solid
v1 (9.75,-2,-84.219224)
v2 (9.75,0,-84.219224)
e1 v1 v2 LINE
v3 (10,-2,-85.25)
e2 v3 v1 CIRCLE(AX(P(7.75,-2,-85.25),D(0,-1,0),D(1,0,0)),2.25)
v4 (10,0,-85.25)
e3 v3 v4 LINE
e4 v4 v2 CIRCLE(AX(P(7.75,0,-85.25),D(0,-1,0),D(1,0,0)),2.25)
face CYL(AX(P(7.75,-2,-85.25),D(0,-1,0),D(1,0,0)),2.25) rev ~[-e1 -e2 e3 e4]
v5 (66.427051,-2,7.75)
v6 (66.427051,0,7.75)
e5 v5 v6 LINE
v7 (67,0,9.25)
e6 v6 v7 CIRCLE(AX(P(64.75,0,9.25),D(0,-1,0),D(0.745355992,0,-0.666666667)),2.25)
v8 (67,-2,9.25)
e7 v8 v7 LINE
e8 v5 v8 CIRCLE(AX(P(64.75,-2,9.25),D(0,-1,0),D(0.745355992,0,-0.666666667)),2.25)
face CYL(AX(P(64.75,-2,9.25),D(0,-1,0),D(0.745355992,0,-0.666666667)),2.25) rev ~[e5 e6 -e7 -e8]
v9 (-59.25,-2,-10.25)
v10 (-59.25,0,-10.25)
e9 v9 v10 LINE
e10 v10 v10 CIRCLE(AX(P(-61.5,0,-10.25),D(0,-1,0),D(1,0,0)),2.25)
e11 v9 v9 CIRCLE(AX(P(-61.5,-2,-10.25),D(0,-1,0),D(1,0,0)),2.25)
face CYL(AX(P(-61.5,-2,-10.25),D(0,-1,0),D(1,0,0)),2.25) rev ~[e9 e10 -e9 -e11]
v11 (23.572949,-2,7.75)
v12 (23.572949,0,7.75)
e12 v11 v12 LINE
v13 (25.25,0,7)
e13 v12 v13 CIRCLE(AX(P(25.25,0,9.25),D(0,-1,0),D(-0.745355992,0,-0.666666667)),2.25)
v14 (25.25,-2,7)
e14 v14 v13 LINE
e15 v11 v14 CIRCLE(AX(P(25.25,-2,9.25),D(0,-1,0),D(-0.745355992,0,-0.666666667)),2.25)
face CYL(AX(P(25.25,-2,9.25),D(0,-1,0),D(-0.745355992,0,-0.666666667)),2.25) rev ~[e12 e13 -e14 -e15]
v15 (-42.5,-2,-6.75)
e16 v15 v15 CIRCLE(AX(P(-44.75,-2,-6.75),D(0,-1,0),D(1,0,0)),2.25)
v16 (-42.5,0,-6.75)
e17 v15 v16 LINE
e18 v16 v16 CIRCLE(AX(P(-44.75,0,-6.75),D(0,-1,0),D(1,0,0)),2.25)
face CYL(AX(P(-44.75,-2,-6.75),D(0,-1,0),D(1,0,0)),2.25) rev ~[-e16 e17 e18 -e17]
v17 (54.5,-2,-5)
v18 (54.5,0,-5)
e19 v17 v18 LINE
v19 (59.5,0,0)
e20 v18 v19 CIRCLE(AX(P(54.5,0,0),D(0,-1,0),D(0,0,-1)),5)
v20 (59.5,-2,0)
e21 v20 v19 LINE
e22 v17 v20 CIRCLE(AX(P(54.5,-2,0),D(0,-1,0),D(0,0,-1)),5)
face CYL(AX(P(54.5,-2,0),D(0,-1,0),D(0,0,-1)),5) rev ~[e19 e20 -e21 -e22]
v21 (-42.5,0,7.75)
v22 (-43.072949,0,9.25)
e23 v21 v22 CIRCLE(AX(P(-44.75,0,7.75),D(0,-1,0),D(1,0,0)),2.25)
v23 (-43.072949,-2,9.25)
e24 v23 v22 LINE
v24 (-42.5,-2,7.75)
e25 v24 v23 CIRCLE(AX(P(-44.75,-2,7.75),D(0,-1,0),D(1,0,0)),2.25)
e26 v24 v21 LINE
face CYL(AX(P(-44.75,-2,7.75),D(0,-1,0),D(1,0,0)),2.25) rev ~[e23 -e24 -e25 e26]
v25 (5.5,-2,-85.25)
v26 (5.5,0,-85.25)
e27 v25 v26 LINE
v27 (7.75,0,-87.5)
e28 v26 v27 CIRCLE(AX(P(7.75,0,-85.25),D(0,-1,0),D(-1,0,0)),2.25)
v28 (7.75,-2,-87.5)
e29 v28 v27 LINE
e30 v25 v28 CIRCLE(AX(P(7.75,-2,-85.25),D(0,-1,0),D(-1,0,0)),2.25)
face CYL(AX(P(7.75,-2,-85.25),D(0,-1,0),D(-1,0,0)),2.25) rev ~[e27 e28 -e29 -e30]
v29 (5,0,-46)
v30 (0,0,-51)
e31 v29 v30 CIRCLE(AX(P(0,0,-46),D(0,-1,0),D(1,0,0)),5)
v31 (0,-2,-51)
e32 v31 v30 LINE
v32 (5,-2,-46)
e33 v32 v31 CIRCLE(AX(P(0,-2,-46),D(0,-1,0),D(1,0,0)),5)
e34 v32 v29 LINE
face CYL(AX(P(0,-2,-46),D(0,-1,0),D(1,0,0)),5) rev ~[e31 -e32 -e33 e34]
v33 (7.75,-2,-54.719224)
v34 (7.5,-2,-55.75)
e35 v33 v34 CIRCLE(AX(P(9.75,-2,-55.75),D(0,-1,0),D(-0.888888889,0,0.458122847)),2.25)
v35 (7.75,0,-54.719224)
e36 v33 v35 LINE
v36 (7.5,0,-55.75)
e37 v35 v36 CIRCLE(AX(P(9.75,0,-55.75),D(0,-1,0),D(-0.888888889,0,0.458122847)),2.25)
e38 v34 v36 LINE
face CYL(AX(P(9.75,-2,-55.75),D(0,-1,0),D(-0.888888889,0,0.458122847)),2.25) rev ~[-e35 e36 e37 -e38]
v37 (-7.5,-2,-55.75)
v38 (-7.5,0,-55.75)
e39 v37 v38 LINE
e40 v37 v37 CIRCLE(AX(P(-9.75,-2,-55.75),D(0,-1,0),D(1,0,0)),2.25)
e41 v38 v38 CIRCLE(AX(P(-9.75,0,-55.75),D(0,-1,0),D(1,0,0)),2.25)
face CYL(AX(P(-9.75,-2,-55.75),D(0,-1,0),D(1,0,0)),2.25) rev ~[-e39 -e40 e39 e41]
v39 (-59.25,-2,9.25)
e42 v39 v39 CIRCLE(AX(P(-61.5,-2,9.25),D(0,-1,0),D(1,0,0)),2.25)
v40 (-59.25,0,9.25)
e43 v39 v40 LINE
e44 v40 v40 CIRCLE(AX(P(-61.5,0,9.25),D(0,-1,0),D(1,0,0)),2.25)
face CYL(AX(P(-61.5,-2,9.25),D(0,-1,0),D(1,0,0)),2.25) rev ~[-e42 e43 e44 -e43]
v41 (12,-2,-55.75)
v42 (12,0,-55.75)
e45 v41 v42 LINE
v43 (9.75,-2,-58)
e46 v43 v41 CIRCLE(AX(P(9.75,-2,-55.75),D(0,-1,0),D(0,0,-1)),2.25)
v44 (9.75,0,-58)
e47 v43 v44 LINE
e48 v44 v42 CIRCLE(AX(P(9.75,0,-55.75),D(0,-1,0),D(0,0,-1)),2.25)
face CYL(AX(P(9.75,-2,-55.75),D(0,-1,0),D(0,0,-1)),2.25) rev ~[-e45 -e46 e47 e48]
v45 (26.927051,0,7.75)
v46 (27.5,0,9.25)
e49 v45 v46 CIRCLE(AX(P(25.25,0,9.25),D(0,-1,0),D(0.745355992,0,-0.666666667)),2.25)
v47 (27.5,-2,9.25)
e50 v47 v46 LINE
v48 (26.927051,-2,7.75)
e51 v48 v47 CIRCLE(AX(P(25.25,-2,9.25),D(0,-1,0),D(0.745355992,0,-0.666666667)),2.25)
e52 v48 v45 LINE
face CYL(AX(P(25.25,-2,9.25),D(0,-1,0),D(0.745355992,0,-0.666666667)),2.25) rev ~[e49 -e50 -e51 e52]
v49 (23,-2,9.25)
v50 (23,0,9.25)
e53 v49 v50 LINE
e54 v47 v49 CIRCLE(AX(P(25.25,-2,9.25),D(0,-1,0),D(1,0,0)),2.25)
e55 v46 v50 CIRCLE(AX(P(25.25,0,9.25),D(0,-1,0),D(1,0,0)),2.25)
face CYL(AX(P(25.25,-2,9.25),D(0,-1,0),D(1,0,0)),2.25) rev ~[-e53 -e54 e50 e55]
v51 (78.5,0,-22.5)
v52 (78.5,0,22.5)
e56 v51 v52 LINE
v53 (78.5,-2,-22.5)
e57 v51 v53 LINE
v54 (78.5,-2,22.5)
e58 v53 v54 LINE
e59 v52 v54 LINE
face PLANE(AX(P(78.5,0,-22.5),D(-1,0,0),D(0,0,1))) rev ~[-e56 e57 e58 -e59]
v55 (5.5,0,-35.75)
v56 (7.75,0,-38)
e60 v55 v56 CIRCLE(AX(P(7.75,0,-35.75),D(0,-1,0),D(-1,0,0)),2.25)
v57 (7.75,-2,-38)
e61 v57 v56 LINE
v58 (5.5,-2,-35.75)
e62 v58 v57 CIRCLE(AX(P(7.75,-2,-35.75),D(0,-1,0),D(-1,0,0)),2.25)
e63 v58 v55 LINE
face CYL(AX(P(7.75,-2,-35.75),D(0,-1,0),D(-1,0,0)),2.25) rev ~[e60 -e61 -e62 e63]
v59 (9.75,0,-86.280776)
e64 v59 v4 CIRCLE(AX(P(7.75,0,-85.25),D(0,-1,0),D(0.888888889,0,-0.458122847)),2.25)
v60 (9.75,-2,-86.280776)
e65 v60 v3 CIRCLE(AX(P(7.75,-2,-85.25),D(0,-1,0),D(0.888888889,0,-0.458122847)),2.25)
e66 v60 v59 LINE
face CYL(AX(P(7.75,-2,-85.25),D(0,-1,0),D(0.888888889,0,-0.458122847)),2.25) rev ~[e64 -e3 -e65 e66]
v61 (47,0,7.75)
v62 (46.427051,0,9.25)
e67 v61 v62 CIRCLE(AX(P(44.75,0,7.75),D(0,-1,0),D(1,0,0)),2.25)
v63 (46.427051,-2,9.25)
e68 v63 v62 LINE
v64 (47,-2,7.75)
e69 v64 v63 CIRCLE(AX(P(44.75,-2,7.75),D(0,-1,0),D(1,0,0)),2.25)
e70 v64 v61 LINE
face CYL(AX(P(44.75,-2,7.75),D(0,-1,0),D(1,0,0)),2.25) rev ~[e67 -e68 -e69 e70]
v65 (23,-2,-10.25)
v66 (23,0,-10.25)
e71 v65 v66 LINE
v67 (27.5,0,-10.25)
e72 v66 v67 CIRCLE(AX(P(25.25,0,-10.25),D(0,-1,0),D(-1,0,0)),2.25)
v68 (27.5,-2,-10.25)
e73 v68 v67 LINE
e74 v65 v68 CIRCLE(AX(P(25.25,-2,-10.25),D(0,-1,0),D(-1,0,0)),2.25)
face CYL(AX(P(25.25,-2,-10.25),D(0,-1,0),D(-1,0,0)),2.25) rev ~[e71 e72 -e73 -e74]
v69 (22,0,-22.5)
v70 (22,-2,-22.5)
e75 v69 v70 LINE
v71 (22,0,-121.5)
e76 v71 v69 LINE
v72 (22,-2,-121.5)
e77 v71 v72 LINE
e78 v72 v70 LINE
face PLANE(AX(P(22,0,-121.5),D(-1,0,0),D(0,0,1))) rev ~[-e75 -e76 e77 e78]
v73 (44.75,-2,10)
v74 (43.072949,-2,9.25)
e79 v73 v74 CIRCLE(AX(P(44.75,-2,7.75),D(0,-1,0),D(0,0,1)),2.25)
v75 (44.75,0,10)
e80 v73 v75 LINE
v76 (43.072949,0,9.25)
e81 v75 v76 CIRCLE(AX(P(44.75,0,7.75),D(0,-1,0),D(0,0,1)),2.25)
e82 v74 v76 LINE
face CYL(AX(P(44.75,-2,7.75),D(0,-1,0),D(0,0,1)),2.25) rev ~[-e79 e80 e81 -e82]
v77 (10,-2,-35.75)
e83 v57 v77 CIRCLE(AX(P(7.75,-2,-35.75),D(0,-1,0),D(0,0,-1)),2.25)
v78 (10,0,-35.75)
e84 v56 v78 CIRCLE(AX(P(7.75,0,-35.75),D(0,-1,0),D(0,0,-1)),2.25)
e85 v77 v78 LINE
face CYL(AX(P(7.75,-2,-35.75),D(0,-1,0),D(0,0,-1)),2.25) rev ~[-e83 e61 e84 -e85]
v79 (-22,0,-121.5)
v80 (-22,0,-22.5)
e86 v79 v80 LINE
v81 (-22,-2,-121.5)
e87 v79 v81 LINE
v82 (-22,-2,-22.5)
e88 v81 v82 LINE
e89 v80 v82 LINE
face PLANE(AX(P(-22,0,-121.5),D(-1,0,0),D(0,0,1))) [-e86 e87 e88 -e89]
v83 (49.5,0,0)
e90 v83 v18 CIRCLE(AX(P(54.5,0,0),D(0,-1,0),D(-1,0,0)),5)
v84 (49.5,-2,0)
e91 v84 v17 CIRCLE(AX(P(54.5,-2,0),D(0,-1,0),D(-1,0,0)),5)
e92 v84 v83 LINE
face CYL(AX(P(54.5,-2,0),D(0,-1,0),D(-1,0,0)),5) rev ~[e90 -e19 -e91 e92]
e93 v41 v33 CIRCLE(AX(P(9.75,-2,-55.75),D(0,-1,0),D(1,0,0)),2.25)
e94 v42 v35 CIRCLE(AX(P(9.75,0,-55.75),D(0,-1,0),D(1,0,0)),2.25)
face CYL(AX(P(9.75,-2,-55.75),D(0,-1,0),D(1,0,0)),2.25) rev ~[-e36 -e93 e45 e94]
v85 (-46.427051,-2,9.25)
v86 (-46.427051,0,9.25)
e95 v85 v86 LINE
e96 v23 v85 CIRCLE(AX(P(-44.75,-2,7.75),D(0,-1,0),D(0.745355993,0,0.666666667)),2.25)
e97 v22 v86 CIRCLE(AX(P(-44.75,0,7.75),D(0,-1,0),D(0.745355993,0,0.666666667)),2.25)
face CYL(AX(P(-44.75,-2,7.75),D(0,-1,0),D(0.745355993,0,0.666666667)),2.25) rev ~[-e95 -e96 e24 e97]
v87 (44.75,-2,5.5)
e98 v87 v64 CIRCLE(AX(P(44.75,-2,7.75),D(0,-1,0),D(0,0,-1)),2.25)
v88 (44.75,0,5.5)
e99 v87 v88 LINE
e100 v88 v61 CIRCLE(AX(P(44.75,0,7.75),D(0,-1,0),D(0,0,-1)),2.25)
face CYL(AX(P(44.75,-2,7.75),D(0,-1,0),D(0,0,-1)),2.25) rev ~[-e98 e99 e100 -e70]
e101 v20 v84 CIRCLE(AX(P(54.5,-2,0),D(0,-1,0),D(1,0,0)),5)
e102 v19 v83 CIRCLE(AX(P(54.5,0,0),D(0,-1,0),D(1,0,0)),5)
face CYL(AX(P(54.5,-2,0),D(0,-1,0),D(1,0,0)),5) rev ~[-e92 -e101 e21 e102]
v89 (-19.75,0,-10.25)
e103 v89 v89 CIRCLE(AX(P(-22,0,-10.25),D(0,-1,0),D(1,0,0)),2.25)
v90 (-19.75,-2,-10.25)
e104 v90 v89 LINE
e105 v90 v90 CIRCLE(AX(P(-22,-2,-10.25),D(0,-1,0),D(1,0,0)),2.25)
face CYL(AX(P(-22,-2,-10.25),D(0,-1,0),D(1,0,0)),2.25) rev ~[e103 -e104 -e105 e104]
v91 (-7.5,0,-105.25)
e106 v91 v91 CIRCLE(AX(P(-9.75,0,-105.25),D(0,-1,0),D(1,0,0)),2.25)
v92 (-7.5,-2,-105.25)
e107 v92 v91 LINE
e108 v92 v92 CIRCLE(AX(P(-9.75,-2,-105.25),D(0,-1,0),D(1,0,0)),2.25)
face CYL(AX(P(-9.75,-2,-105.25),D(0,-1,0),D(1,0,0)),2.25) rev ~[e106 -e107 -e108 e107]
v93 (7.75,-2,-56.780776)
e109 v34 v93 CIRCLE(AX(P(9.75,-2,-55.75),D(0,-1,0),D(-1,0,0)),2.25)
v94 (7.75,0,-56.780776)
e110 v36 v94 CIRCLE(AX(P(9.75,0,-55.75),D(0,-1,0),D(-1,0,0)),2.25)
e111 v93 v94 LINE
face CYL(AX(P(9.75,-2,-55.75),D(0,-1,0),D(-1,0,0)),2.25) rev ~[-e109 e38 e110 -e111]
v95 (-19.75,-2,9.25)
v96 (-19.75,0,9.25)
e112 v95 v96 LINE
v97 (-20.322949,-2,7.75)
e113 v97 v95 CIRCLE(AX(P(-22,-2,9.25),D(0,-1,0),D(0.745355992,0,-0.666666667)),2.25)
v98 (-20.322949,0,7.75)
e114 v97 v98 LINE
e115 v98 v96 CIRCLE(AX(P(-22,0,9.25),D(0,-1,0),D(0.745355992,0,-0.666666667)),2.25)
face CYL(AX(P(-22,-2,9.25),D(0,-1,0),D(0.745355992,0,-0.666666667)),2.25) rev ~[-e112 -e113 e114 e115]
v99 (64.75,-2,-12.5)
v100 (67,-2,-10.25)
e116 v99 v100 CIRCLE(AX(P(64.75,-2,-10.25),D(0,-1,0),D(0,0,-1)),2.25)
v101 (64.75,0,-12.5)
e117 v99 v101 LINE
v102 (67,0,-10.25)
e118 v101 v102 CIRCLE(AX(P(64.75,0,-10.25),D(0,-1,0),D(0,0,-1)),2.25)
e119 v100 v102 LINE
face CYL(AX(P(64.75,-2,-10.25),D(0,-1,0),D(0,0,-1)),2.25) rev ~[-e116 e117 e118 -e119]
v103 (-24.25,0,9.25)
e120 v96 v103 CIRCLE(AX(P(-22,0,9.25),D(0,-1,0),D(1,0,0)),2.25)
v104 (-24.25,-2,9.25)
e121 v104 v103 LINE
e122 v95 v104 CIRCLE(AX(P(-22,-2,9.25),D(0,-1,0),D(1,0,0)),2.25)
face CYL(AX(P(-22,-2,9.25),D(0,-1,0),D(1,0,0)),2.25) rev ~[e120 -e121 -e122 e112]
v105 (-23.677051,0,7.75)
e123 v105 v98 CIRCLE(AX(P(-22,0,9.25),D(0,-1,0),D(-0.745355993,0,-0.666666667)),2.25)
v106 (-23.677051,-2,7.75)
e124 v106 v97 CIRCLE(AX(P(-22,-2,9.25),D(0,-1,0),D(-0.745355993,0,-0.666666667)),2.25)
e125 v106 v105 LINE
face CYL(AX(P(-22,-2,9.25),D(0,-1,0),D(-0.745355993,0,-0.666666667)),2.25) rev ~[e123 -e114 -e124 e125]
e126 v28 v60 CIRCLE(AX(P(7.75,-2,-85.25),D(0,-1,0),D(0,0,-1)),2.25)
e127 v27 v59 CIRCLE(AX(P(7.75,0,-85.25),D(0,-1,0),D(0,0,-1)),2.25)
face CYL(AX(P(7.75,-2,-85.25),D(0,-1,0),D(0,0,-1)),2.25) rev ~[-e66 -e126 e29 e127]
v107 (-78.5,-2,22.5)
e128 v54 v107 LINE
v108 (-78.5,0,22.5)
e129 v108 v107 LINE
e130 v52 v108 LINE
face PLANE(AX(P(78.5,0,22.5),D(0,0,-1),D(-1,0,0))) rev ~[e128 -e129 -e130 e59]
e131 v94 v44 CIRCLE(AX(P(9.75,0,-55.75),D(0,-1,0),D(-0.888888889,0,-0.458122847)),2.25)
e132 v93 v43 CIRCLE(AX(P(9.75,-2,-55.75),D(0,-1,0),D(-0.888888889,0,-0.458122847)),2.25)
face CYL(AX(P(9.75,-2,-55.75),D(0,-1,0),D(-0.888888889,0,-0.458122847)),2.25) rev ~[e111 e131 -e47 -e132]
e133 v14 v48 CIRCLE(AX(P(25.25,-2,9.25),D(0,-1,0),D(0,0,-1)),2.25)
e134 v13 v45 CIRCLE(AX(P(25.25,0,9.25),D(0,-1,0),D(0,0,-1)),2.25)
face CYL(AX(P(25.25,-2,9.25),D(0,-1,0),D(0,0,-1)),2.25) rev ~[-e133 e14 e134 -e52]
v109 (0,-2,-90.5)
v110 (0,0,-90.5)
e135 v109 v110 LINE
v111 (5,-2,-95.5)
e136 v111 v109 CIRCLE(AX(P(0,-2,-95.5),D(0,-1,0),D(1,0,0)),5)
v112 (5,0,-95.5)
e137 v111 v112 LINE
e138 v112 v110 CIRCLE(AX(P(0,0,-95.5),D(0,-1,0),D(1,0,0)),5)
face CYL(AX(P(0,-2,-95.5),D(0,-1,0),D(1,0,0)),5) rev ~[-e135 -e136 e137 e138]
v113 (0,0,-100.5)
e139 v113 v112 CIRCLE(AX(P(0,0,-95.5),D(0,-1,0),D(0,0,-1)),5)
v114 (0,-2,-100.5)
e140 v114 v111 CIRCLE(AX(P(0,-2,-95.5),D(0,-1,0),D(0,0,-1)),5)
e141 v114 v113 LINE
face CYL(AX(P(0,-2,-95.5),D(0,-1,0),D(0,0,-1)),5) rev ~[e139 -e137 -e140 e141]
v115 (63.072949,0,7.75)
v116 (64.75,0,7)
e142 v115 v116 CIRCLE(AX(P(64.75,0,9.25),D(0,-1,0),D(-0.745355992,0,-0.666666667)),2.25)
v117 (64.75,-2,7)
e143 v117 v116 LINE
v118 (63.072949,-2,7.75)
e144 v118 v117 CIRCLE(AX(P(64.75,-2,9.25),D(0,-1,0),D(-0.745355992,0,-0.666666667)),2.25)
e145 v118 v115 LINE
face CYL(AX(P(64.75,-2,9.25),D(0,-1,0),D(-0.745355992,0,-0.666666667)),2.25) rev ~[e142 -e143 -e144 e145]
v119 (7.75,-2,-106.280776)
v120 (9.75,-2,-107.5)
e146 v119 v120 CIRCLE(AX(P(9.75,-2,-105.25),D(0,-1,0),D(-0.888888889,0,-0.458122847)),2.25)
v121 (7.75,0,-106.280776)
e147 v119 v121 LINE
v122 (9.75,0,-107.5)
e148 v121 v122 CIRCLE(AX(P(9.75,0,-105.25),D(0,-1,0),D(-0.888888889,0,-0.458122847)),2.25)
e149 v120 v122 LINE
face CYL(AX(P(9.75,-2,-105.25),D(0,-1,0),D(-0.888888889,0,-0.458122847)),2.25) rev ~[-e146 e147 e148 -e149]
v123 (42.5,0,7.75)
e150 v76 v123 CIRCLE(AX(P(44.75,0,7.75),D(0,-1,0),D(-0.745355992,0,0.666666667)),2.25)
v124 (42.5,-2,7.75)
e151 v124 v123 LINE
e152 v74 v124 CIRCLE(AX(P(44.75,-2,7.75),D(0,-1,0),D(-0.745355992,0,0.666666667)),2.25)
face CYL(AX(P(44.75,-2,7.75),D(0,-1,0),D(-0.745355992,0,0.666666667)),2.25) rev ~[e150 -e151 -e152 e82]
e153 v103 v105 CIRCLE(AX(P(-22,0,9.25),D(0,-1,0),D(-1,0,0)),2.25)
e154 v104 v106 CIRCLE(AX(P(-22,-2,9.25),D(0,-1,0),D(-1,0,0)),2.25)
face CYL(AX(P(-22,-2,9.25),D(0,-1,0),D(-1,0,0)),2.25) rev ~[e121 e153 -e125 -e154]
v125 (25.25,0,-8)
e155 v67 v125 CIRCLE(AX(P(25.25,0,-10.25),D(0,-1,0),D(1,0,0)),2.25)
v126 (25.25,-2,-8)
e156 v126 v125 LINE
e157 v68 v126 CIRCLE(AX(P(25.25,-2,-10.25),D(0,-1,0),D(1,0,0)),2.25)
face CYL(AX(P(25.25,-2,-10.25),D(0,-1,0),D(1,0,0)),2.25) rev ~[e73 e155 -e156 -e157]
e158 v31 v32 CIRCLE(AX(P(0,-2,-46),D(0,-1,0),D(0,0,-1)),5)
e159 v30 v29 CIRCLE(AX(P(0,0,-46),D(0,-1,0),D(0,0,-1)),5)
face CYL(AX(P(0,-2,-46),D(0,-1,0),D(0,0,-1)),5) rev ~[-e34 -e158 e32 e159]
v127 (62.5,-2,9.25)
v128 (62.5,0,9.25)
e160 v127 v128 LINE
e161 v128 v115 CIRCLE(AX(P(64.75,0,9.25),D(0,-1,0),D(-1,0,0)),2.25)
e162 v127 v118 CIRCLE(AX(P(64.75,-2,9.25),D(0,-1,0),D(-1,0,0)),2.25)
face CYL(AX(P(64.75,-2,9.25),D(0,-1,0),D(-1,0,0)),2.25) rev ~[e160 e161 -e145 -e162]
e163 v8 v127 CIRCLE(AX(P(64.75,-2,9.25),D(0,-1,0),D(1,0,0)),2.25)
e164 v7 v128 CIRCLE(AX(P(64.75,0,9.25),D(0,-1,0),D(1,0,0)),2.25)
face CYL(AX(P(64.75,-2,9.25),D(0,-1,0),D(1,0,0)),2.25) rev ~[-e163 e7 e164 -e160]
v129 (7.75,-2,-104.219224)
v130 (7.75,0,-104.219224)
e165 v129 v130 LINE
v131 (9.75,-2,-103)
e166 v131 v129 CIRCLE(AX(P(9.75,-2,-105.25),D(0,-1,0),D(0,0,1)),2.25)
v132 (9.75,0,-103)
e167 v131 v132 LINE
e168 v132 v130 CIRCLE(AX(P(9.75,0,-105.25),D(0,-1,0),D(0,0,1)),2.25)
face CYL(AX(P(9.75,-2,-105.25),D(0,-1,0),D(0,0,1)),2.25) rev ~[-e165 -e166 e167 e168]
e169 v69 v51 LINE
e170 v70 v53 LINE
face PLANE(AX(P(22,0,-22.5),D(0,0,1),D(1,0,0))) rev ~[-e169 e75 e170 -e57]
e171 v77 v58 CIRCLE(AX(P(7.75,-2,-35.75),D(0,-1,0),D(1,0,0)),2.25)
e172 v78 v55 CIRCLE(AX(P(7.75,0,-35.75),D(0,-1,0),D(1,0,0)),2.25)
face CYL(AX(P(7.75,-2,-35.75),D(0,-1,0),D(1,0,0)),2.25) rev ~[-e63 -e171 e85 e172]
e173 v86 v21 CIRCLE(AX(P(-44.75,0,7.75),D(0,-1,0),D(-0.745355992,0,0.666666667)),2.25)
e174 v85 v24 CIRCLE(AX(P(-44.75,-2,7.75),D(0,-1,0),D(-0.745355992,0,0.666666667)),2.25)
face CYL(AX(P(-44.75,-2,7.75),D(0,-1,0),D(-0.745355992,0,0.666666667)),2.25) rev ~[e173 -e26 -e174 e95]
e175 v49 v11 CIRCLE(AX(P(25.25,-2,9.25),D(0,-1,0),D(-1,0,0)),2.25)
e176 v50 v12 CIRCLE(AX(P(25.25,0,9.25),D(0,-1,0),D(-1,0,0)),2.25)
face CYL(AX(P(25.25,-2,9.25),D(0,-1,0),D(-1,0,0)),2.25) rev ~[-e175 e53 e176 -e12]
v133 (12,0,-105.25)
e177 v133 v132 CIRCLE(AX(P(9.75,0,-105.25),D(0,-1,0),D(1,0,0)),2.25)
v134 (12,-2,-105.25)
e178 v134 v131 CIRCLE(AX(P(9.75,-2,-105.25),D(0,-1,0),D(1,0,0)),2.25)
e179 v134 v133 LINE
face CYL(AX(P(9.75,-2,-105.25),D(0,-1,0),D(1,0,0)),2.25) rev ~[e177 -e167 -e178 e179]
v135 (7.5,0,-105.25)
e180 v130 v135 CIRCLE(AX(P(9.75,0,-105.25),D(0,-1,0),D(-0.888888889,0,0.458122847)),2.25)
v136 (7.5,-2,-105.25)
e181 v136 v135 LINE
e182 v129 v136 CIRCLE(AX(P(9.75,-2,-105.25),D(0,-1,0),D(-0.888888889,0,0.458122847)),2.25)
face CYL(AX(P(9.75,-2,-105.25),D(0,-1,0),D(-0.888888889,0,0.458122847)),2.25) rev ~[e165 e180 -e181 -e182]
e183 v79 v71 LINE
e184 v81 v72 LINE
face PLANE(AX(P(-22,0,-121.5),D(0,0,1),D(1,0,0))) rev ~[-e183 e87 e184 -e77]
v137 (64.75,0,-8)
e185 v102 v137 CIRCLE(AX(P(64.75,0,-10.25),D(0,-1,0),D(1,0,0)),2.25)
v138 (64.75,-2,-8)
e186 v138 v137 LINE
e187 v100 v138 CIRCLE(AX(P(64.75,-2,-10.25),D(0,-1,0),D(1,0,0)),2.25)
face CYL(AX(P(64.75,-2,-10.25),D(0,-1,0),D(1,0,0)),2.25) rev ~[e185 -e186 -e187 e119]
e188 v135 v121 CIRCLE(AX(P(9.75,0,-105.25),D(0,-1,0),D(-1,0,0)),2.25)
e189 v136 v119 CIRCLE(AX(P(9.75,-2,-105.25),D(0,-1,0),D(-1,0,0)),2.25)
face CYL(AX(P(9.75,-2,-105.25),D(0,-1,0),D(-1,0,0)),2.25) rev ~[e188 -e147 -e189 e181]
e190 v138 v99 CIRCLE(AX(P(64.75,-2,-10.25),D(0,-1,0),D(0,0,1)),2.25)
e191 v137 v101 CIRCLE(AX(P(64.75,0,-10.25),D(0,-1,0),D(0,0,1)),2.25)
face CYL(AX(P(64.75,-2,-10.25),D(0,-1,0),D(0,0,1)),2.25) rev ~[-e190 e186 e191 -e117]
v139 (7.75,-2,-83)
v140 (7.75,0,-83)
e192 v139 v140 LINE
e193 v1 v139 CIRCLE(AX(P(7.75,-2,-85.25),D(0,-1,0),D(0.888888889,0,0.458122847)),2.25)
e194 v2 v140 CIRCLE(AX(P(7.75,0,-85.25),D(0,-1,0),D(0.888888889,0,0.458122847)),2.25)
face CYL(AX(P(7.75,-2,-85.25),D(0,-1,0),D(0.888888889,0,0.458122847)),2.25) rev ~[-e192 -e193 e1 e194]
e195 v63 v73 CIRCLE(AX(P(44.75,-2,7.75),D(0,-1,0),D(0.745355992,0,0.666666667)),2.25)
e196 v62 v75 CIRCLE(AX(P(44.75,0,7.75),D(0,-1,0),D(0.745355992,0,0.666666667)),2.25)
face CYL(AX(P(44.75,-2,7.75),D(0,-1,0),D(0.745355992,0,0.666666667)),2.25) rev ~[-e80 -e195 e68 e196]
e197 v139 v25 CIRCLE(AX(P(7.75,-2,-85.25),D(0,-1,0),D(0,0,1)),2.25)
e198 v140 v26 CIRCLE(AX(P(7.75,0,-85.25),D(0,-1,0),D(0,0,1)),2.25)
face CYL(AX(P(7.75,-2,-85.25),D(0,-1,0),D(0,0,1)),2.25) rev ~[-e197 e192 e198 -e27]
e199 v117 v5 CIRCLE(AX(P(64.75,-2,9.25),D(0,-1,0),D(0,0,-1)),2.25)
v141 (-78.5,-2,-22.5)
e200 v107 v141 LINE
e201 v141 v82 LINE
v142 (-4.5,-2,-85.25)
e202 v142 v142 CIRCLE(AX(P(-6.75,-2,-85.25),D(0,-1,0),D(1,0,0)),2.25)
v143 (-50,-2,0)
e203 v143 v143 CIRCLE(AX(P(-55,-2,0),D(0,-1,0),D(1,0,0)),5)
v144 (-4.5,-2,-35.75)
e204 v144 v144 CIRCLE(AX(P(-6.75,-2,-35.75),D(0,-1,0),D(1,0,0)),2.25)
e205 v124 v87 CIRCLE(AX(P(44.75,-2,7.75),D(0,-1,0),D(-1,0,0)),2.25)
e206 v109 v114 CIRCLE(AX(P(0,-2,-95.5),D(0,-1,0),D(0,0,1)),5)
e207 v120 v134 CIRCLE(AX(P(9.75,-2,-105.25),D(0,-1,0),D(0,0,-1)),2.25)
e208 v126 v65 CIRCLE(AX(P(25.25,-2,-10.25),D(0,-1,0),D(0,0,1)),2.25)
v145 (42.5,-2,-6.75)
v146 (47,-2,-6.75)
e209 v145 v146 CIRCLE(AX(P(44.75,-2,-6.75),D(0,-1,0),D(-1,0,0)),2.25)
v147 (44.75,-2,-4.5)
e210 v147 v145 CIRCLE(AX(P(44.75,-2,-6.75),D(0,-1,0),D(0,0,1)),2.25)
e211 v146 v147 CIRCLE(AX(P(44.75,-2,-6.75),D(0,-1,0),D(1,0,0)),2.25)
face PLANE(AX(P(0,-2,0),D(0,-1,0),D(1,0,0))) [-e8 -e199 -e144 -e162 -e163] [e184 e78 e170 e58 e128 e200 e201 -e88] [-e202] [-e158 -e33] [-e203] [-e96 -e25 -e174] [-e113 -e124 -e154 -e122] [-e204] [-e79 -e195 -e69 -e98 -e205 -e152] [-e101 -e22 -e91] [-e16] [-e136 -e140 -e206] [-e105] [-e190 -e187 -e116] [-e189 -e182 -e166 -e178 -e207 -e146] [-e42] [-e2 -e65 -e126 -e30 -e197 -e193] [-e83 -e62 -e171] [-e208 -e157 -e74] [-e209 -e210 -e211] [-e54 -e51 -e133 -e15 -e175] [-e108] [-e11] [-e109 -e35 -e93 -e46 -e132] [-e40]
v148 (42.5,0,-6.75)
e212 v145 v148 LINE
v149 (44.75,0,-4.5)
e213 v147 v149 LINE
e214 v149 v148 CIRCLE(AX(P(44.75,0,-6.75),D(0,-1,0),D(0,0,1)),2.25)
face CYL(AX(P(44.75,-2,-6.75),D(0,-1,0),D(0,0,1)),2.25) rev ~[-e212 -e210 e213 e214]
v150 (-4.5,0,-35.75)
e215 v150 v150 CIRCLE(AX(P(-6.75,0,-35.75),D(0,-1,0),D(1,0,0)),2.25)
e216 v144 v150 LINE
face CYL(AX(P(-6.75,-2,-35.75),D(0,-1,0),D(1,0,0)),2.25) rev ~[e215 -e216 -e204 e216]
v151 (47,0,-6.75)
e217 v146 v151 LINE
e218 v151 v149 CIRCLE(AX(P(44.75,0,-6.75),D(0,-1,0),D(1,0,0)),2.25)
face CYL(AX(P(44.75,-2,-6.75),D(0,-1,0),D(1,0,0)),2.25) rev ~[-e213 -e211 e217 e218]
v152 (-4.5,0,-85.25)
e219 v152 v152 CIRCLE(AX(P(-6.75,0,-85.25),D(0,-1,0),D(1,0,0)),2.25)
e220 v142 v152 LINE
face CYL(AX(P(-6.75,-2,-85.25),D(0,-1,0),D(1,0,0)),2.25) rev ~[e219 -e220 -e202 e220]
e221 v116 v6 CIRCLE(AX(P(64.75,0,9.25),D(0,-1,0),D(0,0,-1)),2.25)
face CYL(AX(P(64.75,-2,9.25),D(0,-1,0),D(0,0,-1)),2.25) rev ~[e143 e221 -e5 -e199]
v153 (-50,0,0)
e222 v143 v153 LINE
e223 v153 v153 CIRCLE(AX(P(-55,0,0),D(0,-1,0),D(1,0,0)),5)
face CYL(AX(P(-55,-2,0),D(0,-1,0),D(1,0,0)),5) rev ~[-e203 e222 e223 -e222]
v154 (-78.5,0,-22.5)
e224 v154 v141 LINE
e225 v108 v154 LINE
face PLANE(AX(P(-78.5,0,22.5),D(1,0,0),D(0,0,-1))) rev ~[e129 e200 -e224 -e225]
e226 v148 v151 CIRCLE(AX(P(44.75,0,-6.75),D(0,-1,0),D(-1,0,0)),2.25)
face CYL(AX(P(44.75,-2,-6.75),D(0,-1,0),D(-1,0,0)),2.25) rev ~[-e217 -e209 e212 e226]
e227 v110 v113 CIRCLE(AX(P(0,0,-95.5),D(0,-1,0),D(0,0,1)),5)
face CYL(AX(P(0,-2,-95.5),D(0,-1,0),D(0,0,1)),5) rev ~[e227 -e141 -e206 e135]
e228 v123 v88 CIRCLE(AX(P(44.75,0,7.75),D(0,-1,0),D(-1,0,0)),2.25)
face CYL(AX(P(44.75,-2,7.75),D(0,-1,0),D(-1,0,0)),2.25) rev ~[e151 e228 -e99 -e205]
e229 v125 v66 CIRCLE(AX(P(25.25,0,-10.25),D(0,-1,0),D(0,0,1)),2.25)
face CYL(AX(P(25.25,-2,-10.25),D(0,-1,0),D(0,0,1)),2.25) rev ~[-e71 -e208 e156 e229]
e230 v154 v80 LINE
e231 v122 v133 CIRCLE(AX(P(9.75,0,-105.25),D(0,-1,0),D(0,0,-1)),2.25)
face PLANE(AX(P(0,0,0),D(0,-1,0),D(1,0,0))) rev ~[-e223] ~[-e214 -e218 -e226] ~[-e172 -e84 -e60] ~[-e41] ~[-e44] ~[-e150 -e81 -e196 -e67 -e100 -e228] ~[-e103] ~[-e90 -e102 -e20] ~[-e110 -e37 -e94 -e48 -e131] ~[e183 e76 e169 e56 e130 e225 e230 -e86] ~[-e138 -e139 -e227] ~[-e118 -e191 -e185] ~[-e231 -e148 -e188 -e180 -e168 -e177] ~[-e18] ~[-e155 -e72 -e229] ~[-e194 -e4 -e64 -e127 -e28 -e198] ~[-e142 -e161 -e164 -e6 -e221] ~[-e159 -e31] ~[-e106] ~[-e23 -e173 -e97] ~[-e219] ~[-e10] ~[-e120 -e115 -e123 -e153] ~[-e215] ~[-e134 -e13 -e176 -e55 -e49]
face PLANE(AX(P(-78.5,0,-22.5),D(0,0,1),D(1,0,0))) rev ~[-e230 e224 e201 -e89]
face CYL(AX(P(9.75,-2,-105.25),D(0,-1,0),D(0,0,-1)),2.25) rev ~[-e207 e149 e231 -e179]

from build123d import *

# Parameters (mm, degrees)
F0_W     = 44
F0_H     = 99
F1_DEPTH = 2
F2_R     = 2.25
F2_R_2   = 5
F3_DEPTH = 2.001


with BuildPart() as f1:
    # F0 (on Front) → F1 (new body)
    with BuildSketch(Plane.XZ):
        Polygon((-78.5, 22.5), (-78.5, -22.5), (-22, -22.5), (22, -22.5), (78.5, -22.5), (78.5, 22.5), align=None)
        with Locations((0, -72)):
            Rectangle(F0_W, F0_H)
    extrude(amount=F1_DEPTH)

    # F2 (on face) → F3 (cut, through all)
    with BuildSketch(Plane.XZ.offset(2)):
        with BuildLine():
            ThreePointArc((7.75, -106.2807764064), (8.5788353904, -107.1711646096), (9.75, -107.5))
            Line((9.75, -107.5), (9.75, -105.25))
            Line((9.75, -105.25), (7.75, -105.25))
            Line((7.75, -105.25), (7.75, -106.2807764064))
        make_face()
        with BuildLine():
            Line((9.75, -105.25), (9.75, -107.5))
            ThreePointArc((9.75, -107.5), (11.3409902577, -106.8409902577), (12, -105.25))
            Line((12, -105.25), (9.75, -105.25))
        make_face()
        with BuildLine():
            Line((9.75, -103), (9.75, -105.25))
            Line((9.75, -105.25), (12, -105.25))
            ThreePointArc((12, -105.25), (11.3409902577, -103.6590097423), (9.75, -103))
        make_face()
        with BuildLine():
            Line((7.75, -105.25), (9.75, -105.25))
            Line((9.75, -105.25), (9.75, -103))
            ThreePointArc((9.75, -103), (8.5788353904, -103.3288353904), (7.75, -104.2192235936))
            Line((7.75, -104.2192235936), (7.75, -105.25))
        make_face()
        with BuildLine():
            ThreePointArc((7.5, -105.25), (7.5633930394, -105.7803300859), (7.75, -106.2807764064))
            Line((7.75, -106.2807764064), (7.75, -105.25))
            Line((7.75, -105.25), (7.5, -105.25))
        make_face()
        with Locations((-9.75, -105.25)):
            Circle(F2_R)
        with Locations((-6.75, -85.25)):
            Circle(F2_R)
        with Locations((-9.75, -55.75)):
            Circle(F2_R)
        with BuildLine():
            ThreePointArc((5, -46), (-3.5355339059, -42.4644660941), (0, -51))
            ThreePointArc((0, -51), (3.5355339059, -49.5355339059), (5, -46))
        make_face()
        with Locations((-6.75, -35.75)):
            Circle(F2_R)
        with BuildLine():
            ThreePointArc((5.5, -35.75), (6.1590097423, -37.3409902577), (7.75, -38))
            Line((7.75, -38), (7.75, -35.75))
            Line((7.75, -35.75), (5.5, -35.75))
        make_face()
        with BuildLine():
            Line((7.75, -35.75), (7.75, -38))
            ThreePointArc((7.75, -38), (9.3409902577, -37.3409902577), (10, -35.75))
            ThreePointArc((10, -35.75), (7.75, -33.5), (5.5, -35.75))
            Line((5.5, -35.75), (7.75, -35.75))
        make_face()
        with Locations((-61.5, -10.25)):
            Circle(F2_R)
        with BuildLine():
            ThreePointArc((-24.25, -10.25), (-22, -12.5), (-19.75, -10.25))
            Line((-19.75, -10.25), (-22, -10.25))
            Line((-22, -10.25), (-24.25, -10.25))
        make_face()
        with BuildLine():
            Line((-22, -10.25), (-19.75, -10.25))
            ThreePointArc((-19.75, -10.25), (-22, -8), (-24.25, -10.25))
            Line((-24.25, -10.25), (-22, -10.25))
        make_face()
        with BuildLine():
            ThreePointArc((27.5, -10.25), (26.8409902577, -8.6590097423), (25.25, -8))
            Line((25.25, -8), (25.25, -10.25))
            Line((25.25, -10.25), (23, -10.25))
            ThreePointArc((23, -10.25), (25.25, -12.5), (27.5, -10.25))
        make_face()
        with BuildLine():
            Line((25.25, -10.25), (25.25, -8))
            ThreePointArc((25.25, -8), (23.6590097423, -8.6590097423), (23, -10.25))
            Line((23, -10.25), (25.25, -10.25))
        make_face()
        with Locations((-44.75, -6.75)):
            Circle(F2_R)
        with Locations((-55, 0)):
            Circle(F2_R_2)
        with Locations((-61.5, 9.25)):
            Circle(F2_R)
        with BuildLine():
            Line((7.5, -105.25), (7.75, -105.25))
            Line((7.75, -105.25), (7.75, -104.2192235936))
            ThreePointArc((7.75, -104.2192235936), (7.5633930394, -104.7196699141), (7.5, -105.25))
        make_face()
        with BuildLine():
            ThreePointArc((0, -90.5), (-5, -95.5), (0, -100.5))
            Line((0, -100.5), (0, -95.5))
            Line((0, -95.5), (0, -90.5))
        make_face()
        with BuildLine():
            Line((0, -95.5), (0, -100.5))
            ThreePointArc((0, -100.5), (3.5355339059, -99.0355339059), (5, -95.5))
            Line((5, -95.5), (0, -95.5))
        make_face()
        with BuildLine():
            Line((9.75, -85.25), (9.75, -86.2807764064))
            ThreePointArc((9.75, -86.2807764064), (9.9366069606, -85.7803300859), (10, -85.25))
            Line((10, -85.25), (9.75, -85.25))
        make_face()
        with BuildLine():
            ThreePointArc((7.75, -87.5), (8.9211646096, -87.1711646096), (9.75, -86.2807764064))
            Line((9.75, -86.2807764064), (9.75, -85.25))
            Line((9.75, -85.25), (7.75, -85.25))
            Line((7.75, -85.25), (7.75, -87.5))
        make_face()
        with BuildLine():
            Line((0, -90.5), (0, -95.5))
            Line((0, -95.5), (5, -95.5))
            ThreePointArc((5, -95.5), (3.5355339059, -91.9644660941), (0, -90.5))
        make_face()
        with BuildLine():
            Line((9.75, -85.25), (10, -85.25))
            ThreePointArc((10, -85.25), (9.9366069606, -84.7196699141), (9.75, -84.2192235936))
            Line((9.75, -84.2192235936), (9.75, -85.25))
        make_face()
        with BuildLine():
            ThreePointArc((5.5, -85.25), (6.1590097423, -86.8409902577), (7.75, -87.5))
            Line((7.75, -87.5), (7.75, -85.25))
            Line((7.75, -85.25), (5.5, -85.25))
        make_face()
        with BuildLine():
            Line((7.75, -85.25), (9.75, -85.25))
            Line((9.75, -85.25), (9.75, -84.2192235936))
            ThreePointArc((9.75, -84.2192235936), (8.9211646096, -83.3288353904), (7.75, -83))
            Line((7.75, -83), (7.75, -85.25))
        make_face()
        with BuildLine():
            Line((5.5, -85.25), (7.75, -85.25))
            Line((7.75, -85.25), (7.75, -83))
            ThreePointArc((7.75, -83), (6.1590097423, -83.6590097423), (5.5, -85.25))
        make_face()
        with BuildLine():
            ThreePointArc((7.75, -56.7807764064), (8.5788353904, -57.6711646096), (9.75, -58))
            Line((9.75, -58), (9.75, -55.75))
            Line((9.75, -55.75), (7.75, -55.75))
            Line((7.75, -55.75), (7.75, -56.7807764064))
        make_face()
        with BuildLine():
            Line((9.75, -55.75), (9.75, -58))
            ThreePointArc((9.75, -58), (11.3409902577, -57.3409902577), (12, -55.75))
            ThreePointArc((12, -55.75), (10.2803300859, -53.5633930394), (7.75, -54.7192235936))
            Line((7.75, -54.7192235936), (7.75, -55.75))
            Line((7.75, -55.75), (9.75, -55.75))
        make_face()
        with BuildLine():
            ThreePointArc((49.5, 0), (50.9644660941, -3.5355339059), (54.5, -5))
            Line((54.5, -5), (54.5, 0))
            Line((54.5, 0), (49.5, 0))
        make_face()
        with BuildLine():
            Line((54.5, 0), (54.5, -5))
            ThreePointArc((54.5, -5), (58.0355339059, -3.5355339059), (59.5, 0))
            Line((59.5, 0), (54.5, 0))
        make_face()
        with BuildLine():
            Line((7.75, -55.75), (7.5, -55.75))
            ThreePointArc((7.5, -55.75), (7.5633930394, -56.2803300859), (7.75, -56.7807764064))
            Line((7.75, -56.7807764064), (7.75, -55.75))
        make_face()
        with BuildLine():
            ThreePointArc((7.75, -54.7192235936), (7.5633930394, -55.2196699141), (7.5, -55.75))
            Line((7.5, -55.75), (7.75, -55.75))
            Line((7.75, -55.75), (7.75, -54.7192235936))
        make_face()
        with BuildLine():
            Line((44.75, 9.25), (44.75, 10))
            ThreePointArc((44.75, 10), (43.8314413465, 9.8039595906), (43.0729490169, 9.25))
            Line((43.0729490169, 9.25), (44.75, 9.25))
        make_face()
        with BuildLine():
            ThreePointArc((46.4270509831, 9.25), (45.6685586535, 9.8039595906), (44.75, 10))
            Line((44.75, 10), (44.75, 9.25))
            Line((44.75, 9.25), (46.4270509831, 9.25))
        make_face()
        with BuildLine():
            Line((49.5, 0), (54.5, 0))
            Line((54.5, 0), (59.5, 0))
            ThreePointArc((59.5, 0), (54.5, 5), (49.5, 0))
        make_face()
        with BuildLine():
            ThreePointArc((64.75, -8), (62.5, -10.25), (64.75, -12.5))
            Line((64.75, -12.5), (64.75, -10.25))
            Line((64.75, -10.25), (64.75, -8))
        make_face()
        with BuildLine():
            Line((64.75, -10.25), (64.75, -12.5))
            ThreePointArc((64.75, -12.5), (66.3409902577, -11.8409902577), (67, -10.25))
            Line((67, -10.25), (64.75, -10.25))
        make_face()
        with BuildLine():
            ThreePointArc((47, 7.75), (46.8518878077, 8.552849702), (46.4270509831, 9.25))
            Line((46.4270509831, 9.25), (44.75, 9.25))
            Line((44.75, 9.25), (44.75, 7.75))
            Line((44.75, 7.75), (47, 7.75))
        make_face()
        with BuildLine():
            Line((44.75, 9.25), (43.0729490169, 9.25))
            ThreePointArc((43.0729490169, 9.25), (42.6481121923, 8.552849702), (42.5, 7.75))
            Line((42.5, 7.75), (44.75, 7.75))
            Line((44.75, 7.75), (44.75, 9.25))
        make_face()
        with BuildLine():
            Line((64.75, -8), (64.75, -10.25))
            Line((64.75, -10.25), (67, -10.25))
            ThreePointArc((67, -10.25), (66.3409902577, -8.6590097423), (64.75, -8))
        make_face()
        with BuildLine():
            ThreePointArc((44.75, 5.5), (46.3409902577, 6.1590097423), (47, 7.75))
            Line((47, 7.75), (44.75, 7.75))
            Line((44.75, 7.75), (44.75, 5.5))
        make_face()
        with BuildLine():
            Line((64.75, 9.25), (62.5, 9.25))
            ThreePointArc((62.5, 9.25), (62.6481121923, 8.447150298), (63.0729490169, 7.75))
            Line((63.0729490169, 7.75), (64.75, 7.75))
            Line((64.75, 7.75), (64.75, 9.25))
        make_face()
        with BuildLine():
            ThreePointArc((67, 9.25), (64.75, 11.5), (62.5, 9.25))
            Line((62.5, 9.25), (64.75, 9.25))
            Line((64.75, 9.25), (64.75, 7.75))
            Line((64.75, 7.75), (66.4270509831, 7.75))
            ThreePointArc((66.4270509831, 7.75), (66.8518878077, 8.447150298), (67, 9.25))
        make_face()
        with BuildLine():
            Line((44.75, 7.75), (42.5, 7.75))
            ThreePointArc((42.5, 7.75), (43.1590097423, 6.1590097423), (44.75, 5.5))
            Line((44.75, 5.5), (44.75, 7.75))
        make_face()
        with BuildLine():
            ThreePointArc((26.9270509831, 7.75), (27.3518878077, 8.447150298), (27.5, 9.25))
            Line((27.5, 9.25), (25.25, 9.25))
            Line((25.25, 9.25), (25.25, 7.75))
            Line((25.25, 7.75), (26.9270509831, 7.75))
        make_face()
        with BuildLine():
            Line((25.25, 9.25), (27.5, 9.25))
            ThreePointArc((27.5, 9.25), (25.25, 11.5), (23, 9.25))
            Line((23, 9.25), (25.25, 9.25))
        make_face()
        with BuildLine():
            ThreePointArc((64.75, 7), (65.6685586535, 7.1960404094), (66.4270509831, 7.75))
            Line((66.4270509831, 7.75), (64.75, 7.75))
            Line((64.75, 7.75), (64.75, 7))
        make_face()
        with BuildLine():
            ThreePointArc((47, -6.75), (46.3409902577, -5.1590097423), (44.75, -4.5))
            Line((44.75, -4.5), (44.75, -6.75))
            Line((44.75, -6.75), (42.5, -6.75))
            ThreePointArc((42.5, -6.75), (44.75, -9), (47, -6.75))
        make_face()
        with BuildLine():
            Line((44.75, -6.75), (44.75, -4.5))
            ThreePointArc((44.75, -4.5), (43.1590097423, -5.1590097423), (42.5, -6.75))
            Line((42.5, -6.75), (44.75, -6.75))
        make_face()
        with BuildLine():
            ThreePointArc((63.0729490169, 7.75), (63.8314413465, 7.1960404094), (64.75, 7))
            Line((64.75, 7), (64.75, 7.75))
            Line((64.75, 7.75), (63.0729490169, 7.75))
        make_face()
        with BuildLine():
            ThreePointArc((25.25, 7), (26.1685586535, 7.1960404094), (26.9270509831, 7.75))
            Line((26.9270509831, 7.75), (25.25, 7.75))
            Line((25.25, 7.75), (25.25, 7))
        make_face()
        with BuildLine():
            Line((25.25, 7.75), (25.25, 9.25))
            Line((25.25, 9.25), (23, 9.25))
            ThreePointArc((23, 9.25), (23.1481121923, 8.447150298), (23.5729490169, 7.75))
            Line((23.5729490169, 7.75), (25.25, 7.75))
        make_face()
        with BuildLine():
            ThreePointArc((23.5729490169, 7.75), (24.3314413465, 7.1960404094), (25.25, 7))
            Line((25.25, 7), (25.25, 7.75))
            Line((25.25, 7.75), (23.5729490169, 7.75))
        make_face()
        with BuildLine():
            ThreePointArc((-20.3229490169, 7.75), (-19.8981121923, 8.447150298), (-19.75, 9.25))
            Line((-19.75, 9.25), (-22, 9.25))
            Line((-22, 9.25), (-24.25, 9.25))
            ThreePointArc((-24.25, 9.25), (-24.1018878077, 8.447150298), (-23.6770509831, 7.75))
            Line((-23.6770509831, 7.75), (-20.3229490169, 7.75))
        make_face()
        with BuildLine():
            Line((-22, 9.25), (-19.75, 9.25))
            ThreePointArc((-19.75, 9.25), (-22, 11.5), (-24.25, 9.25))
            Line((-24.25, 9.25), (-22, 9.25))
        make_face()
        with BuildLine():
            ThreePointArc((-23.6770509831, 7.75), (-22, 7), (-20.3229490169, 7.75))
            Line((-20.3229490169, 7.75), (-23.6770509831, 7.75))
        make_face()
        with BuildLine():
            ThreePointArc((-42.5, 7.75), (-42.6481121923, 8.552849702), (-43.0729490169, 9.25))
            Line((-43.0729490169, 9.25), (-46.4270509831, 9.25))
            ThreePointArc((-46.4270509831, 9.25), (-45.552849702, 5.6481121923), (-42.5, 7.75))
        make_face()
        with BuildLine():
            Line((-46.4270509831, 9.25), (-43.0729490169, 9.25))
            ThreePointArc((-43.0729490169, 9.25), (-44.75, 10), (-46.4270509831, 9.25))
        make_face()
    extrude(amount=-F3_DEPTH, mode=Mode.SUBTRACT)


solid = f1.part
